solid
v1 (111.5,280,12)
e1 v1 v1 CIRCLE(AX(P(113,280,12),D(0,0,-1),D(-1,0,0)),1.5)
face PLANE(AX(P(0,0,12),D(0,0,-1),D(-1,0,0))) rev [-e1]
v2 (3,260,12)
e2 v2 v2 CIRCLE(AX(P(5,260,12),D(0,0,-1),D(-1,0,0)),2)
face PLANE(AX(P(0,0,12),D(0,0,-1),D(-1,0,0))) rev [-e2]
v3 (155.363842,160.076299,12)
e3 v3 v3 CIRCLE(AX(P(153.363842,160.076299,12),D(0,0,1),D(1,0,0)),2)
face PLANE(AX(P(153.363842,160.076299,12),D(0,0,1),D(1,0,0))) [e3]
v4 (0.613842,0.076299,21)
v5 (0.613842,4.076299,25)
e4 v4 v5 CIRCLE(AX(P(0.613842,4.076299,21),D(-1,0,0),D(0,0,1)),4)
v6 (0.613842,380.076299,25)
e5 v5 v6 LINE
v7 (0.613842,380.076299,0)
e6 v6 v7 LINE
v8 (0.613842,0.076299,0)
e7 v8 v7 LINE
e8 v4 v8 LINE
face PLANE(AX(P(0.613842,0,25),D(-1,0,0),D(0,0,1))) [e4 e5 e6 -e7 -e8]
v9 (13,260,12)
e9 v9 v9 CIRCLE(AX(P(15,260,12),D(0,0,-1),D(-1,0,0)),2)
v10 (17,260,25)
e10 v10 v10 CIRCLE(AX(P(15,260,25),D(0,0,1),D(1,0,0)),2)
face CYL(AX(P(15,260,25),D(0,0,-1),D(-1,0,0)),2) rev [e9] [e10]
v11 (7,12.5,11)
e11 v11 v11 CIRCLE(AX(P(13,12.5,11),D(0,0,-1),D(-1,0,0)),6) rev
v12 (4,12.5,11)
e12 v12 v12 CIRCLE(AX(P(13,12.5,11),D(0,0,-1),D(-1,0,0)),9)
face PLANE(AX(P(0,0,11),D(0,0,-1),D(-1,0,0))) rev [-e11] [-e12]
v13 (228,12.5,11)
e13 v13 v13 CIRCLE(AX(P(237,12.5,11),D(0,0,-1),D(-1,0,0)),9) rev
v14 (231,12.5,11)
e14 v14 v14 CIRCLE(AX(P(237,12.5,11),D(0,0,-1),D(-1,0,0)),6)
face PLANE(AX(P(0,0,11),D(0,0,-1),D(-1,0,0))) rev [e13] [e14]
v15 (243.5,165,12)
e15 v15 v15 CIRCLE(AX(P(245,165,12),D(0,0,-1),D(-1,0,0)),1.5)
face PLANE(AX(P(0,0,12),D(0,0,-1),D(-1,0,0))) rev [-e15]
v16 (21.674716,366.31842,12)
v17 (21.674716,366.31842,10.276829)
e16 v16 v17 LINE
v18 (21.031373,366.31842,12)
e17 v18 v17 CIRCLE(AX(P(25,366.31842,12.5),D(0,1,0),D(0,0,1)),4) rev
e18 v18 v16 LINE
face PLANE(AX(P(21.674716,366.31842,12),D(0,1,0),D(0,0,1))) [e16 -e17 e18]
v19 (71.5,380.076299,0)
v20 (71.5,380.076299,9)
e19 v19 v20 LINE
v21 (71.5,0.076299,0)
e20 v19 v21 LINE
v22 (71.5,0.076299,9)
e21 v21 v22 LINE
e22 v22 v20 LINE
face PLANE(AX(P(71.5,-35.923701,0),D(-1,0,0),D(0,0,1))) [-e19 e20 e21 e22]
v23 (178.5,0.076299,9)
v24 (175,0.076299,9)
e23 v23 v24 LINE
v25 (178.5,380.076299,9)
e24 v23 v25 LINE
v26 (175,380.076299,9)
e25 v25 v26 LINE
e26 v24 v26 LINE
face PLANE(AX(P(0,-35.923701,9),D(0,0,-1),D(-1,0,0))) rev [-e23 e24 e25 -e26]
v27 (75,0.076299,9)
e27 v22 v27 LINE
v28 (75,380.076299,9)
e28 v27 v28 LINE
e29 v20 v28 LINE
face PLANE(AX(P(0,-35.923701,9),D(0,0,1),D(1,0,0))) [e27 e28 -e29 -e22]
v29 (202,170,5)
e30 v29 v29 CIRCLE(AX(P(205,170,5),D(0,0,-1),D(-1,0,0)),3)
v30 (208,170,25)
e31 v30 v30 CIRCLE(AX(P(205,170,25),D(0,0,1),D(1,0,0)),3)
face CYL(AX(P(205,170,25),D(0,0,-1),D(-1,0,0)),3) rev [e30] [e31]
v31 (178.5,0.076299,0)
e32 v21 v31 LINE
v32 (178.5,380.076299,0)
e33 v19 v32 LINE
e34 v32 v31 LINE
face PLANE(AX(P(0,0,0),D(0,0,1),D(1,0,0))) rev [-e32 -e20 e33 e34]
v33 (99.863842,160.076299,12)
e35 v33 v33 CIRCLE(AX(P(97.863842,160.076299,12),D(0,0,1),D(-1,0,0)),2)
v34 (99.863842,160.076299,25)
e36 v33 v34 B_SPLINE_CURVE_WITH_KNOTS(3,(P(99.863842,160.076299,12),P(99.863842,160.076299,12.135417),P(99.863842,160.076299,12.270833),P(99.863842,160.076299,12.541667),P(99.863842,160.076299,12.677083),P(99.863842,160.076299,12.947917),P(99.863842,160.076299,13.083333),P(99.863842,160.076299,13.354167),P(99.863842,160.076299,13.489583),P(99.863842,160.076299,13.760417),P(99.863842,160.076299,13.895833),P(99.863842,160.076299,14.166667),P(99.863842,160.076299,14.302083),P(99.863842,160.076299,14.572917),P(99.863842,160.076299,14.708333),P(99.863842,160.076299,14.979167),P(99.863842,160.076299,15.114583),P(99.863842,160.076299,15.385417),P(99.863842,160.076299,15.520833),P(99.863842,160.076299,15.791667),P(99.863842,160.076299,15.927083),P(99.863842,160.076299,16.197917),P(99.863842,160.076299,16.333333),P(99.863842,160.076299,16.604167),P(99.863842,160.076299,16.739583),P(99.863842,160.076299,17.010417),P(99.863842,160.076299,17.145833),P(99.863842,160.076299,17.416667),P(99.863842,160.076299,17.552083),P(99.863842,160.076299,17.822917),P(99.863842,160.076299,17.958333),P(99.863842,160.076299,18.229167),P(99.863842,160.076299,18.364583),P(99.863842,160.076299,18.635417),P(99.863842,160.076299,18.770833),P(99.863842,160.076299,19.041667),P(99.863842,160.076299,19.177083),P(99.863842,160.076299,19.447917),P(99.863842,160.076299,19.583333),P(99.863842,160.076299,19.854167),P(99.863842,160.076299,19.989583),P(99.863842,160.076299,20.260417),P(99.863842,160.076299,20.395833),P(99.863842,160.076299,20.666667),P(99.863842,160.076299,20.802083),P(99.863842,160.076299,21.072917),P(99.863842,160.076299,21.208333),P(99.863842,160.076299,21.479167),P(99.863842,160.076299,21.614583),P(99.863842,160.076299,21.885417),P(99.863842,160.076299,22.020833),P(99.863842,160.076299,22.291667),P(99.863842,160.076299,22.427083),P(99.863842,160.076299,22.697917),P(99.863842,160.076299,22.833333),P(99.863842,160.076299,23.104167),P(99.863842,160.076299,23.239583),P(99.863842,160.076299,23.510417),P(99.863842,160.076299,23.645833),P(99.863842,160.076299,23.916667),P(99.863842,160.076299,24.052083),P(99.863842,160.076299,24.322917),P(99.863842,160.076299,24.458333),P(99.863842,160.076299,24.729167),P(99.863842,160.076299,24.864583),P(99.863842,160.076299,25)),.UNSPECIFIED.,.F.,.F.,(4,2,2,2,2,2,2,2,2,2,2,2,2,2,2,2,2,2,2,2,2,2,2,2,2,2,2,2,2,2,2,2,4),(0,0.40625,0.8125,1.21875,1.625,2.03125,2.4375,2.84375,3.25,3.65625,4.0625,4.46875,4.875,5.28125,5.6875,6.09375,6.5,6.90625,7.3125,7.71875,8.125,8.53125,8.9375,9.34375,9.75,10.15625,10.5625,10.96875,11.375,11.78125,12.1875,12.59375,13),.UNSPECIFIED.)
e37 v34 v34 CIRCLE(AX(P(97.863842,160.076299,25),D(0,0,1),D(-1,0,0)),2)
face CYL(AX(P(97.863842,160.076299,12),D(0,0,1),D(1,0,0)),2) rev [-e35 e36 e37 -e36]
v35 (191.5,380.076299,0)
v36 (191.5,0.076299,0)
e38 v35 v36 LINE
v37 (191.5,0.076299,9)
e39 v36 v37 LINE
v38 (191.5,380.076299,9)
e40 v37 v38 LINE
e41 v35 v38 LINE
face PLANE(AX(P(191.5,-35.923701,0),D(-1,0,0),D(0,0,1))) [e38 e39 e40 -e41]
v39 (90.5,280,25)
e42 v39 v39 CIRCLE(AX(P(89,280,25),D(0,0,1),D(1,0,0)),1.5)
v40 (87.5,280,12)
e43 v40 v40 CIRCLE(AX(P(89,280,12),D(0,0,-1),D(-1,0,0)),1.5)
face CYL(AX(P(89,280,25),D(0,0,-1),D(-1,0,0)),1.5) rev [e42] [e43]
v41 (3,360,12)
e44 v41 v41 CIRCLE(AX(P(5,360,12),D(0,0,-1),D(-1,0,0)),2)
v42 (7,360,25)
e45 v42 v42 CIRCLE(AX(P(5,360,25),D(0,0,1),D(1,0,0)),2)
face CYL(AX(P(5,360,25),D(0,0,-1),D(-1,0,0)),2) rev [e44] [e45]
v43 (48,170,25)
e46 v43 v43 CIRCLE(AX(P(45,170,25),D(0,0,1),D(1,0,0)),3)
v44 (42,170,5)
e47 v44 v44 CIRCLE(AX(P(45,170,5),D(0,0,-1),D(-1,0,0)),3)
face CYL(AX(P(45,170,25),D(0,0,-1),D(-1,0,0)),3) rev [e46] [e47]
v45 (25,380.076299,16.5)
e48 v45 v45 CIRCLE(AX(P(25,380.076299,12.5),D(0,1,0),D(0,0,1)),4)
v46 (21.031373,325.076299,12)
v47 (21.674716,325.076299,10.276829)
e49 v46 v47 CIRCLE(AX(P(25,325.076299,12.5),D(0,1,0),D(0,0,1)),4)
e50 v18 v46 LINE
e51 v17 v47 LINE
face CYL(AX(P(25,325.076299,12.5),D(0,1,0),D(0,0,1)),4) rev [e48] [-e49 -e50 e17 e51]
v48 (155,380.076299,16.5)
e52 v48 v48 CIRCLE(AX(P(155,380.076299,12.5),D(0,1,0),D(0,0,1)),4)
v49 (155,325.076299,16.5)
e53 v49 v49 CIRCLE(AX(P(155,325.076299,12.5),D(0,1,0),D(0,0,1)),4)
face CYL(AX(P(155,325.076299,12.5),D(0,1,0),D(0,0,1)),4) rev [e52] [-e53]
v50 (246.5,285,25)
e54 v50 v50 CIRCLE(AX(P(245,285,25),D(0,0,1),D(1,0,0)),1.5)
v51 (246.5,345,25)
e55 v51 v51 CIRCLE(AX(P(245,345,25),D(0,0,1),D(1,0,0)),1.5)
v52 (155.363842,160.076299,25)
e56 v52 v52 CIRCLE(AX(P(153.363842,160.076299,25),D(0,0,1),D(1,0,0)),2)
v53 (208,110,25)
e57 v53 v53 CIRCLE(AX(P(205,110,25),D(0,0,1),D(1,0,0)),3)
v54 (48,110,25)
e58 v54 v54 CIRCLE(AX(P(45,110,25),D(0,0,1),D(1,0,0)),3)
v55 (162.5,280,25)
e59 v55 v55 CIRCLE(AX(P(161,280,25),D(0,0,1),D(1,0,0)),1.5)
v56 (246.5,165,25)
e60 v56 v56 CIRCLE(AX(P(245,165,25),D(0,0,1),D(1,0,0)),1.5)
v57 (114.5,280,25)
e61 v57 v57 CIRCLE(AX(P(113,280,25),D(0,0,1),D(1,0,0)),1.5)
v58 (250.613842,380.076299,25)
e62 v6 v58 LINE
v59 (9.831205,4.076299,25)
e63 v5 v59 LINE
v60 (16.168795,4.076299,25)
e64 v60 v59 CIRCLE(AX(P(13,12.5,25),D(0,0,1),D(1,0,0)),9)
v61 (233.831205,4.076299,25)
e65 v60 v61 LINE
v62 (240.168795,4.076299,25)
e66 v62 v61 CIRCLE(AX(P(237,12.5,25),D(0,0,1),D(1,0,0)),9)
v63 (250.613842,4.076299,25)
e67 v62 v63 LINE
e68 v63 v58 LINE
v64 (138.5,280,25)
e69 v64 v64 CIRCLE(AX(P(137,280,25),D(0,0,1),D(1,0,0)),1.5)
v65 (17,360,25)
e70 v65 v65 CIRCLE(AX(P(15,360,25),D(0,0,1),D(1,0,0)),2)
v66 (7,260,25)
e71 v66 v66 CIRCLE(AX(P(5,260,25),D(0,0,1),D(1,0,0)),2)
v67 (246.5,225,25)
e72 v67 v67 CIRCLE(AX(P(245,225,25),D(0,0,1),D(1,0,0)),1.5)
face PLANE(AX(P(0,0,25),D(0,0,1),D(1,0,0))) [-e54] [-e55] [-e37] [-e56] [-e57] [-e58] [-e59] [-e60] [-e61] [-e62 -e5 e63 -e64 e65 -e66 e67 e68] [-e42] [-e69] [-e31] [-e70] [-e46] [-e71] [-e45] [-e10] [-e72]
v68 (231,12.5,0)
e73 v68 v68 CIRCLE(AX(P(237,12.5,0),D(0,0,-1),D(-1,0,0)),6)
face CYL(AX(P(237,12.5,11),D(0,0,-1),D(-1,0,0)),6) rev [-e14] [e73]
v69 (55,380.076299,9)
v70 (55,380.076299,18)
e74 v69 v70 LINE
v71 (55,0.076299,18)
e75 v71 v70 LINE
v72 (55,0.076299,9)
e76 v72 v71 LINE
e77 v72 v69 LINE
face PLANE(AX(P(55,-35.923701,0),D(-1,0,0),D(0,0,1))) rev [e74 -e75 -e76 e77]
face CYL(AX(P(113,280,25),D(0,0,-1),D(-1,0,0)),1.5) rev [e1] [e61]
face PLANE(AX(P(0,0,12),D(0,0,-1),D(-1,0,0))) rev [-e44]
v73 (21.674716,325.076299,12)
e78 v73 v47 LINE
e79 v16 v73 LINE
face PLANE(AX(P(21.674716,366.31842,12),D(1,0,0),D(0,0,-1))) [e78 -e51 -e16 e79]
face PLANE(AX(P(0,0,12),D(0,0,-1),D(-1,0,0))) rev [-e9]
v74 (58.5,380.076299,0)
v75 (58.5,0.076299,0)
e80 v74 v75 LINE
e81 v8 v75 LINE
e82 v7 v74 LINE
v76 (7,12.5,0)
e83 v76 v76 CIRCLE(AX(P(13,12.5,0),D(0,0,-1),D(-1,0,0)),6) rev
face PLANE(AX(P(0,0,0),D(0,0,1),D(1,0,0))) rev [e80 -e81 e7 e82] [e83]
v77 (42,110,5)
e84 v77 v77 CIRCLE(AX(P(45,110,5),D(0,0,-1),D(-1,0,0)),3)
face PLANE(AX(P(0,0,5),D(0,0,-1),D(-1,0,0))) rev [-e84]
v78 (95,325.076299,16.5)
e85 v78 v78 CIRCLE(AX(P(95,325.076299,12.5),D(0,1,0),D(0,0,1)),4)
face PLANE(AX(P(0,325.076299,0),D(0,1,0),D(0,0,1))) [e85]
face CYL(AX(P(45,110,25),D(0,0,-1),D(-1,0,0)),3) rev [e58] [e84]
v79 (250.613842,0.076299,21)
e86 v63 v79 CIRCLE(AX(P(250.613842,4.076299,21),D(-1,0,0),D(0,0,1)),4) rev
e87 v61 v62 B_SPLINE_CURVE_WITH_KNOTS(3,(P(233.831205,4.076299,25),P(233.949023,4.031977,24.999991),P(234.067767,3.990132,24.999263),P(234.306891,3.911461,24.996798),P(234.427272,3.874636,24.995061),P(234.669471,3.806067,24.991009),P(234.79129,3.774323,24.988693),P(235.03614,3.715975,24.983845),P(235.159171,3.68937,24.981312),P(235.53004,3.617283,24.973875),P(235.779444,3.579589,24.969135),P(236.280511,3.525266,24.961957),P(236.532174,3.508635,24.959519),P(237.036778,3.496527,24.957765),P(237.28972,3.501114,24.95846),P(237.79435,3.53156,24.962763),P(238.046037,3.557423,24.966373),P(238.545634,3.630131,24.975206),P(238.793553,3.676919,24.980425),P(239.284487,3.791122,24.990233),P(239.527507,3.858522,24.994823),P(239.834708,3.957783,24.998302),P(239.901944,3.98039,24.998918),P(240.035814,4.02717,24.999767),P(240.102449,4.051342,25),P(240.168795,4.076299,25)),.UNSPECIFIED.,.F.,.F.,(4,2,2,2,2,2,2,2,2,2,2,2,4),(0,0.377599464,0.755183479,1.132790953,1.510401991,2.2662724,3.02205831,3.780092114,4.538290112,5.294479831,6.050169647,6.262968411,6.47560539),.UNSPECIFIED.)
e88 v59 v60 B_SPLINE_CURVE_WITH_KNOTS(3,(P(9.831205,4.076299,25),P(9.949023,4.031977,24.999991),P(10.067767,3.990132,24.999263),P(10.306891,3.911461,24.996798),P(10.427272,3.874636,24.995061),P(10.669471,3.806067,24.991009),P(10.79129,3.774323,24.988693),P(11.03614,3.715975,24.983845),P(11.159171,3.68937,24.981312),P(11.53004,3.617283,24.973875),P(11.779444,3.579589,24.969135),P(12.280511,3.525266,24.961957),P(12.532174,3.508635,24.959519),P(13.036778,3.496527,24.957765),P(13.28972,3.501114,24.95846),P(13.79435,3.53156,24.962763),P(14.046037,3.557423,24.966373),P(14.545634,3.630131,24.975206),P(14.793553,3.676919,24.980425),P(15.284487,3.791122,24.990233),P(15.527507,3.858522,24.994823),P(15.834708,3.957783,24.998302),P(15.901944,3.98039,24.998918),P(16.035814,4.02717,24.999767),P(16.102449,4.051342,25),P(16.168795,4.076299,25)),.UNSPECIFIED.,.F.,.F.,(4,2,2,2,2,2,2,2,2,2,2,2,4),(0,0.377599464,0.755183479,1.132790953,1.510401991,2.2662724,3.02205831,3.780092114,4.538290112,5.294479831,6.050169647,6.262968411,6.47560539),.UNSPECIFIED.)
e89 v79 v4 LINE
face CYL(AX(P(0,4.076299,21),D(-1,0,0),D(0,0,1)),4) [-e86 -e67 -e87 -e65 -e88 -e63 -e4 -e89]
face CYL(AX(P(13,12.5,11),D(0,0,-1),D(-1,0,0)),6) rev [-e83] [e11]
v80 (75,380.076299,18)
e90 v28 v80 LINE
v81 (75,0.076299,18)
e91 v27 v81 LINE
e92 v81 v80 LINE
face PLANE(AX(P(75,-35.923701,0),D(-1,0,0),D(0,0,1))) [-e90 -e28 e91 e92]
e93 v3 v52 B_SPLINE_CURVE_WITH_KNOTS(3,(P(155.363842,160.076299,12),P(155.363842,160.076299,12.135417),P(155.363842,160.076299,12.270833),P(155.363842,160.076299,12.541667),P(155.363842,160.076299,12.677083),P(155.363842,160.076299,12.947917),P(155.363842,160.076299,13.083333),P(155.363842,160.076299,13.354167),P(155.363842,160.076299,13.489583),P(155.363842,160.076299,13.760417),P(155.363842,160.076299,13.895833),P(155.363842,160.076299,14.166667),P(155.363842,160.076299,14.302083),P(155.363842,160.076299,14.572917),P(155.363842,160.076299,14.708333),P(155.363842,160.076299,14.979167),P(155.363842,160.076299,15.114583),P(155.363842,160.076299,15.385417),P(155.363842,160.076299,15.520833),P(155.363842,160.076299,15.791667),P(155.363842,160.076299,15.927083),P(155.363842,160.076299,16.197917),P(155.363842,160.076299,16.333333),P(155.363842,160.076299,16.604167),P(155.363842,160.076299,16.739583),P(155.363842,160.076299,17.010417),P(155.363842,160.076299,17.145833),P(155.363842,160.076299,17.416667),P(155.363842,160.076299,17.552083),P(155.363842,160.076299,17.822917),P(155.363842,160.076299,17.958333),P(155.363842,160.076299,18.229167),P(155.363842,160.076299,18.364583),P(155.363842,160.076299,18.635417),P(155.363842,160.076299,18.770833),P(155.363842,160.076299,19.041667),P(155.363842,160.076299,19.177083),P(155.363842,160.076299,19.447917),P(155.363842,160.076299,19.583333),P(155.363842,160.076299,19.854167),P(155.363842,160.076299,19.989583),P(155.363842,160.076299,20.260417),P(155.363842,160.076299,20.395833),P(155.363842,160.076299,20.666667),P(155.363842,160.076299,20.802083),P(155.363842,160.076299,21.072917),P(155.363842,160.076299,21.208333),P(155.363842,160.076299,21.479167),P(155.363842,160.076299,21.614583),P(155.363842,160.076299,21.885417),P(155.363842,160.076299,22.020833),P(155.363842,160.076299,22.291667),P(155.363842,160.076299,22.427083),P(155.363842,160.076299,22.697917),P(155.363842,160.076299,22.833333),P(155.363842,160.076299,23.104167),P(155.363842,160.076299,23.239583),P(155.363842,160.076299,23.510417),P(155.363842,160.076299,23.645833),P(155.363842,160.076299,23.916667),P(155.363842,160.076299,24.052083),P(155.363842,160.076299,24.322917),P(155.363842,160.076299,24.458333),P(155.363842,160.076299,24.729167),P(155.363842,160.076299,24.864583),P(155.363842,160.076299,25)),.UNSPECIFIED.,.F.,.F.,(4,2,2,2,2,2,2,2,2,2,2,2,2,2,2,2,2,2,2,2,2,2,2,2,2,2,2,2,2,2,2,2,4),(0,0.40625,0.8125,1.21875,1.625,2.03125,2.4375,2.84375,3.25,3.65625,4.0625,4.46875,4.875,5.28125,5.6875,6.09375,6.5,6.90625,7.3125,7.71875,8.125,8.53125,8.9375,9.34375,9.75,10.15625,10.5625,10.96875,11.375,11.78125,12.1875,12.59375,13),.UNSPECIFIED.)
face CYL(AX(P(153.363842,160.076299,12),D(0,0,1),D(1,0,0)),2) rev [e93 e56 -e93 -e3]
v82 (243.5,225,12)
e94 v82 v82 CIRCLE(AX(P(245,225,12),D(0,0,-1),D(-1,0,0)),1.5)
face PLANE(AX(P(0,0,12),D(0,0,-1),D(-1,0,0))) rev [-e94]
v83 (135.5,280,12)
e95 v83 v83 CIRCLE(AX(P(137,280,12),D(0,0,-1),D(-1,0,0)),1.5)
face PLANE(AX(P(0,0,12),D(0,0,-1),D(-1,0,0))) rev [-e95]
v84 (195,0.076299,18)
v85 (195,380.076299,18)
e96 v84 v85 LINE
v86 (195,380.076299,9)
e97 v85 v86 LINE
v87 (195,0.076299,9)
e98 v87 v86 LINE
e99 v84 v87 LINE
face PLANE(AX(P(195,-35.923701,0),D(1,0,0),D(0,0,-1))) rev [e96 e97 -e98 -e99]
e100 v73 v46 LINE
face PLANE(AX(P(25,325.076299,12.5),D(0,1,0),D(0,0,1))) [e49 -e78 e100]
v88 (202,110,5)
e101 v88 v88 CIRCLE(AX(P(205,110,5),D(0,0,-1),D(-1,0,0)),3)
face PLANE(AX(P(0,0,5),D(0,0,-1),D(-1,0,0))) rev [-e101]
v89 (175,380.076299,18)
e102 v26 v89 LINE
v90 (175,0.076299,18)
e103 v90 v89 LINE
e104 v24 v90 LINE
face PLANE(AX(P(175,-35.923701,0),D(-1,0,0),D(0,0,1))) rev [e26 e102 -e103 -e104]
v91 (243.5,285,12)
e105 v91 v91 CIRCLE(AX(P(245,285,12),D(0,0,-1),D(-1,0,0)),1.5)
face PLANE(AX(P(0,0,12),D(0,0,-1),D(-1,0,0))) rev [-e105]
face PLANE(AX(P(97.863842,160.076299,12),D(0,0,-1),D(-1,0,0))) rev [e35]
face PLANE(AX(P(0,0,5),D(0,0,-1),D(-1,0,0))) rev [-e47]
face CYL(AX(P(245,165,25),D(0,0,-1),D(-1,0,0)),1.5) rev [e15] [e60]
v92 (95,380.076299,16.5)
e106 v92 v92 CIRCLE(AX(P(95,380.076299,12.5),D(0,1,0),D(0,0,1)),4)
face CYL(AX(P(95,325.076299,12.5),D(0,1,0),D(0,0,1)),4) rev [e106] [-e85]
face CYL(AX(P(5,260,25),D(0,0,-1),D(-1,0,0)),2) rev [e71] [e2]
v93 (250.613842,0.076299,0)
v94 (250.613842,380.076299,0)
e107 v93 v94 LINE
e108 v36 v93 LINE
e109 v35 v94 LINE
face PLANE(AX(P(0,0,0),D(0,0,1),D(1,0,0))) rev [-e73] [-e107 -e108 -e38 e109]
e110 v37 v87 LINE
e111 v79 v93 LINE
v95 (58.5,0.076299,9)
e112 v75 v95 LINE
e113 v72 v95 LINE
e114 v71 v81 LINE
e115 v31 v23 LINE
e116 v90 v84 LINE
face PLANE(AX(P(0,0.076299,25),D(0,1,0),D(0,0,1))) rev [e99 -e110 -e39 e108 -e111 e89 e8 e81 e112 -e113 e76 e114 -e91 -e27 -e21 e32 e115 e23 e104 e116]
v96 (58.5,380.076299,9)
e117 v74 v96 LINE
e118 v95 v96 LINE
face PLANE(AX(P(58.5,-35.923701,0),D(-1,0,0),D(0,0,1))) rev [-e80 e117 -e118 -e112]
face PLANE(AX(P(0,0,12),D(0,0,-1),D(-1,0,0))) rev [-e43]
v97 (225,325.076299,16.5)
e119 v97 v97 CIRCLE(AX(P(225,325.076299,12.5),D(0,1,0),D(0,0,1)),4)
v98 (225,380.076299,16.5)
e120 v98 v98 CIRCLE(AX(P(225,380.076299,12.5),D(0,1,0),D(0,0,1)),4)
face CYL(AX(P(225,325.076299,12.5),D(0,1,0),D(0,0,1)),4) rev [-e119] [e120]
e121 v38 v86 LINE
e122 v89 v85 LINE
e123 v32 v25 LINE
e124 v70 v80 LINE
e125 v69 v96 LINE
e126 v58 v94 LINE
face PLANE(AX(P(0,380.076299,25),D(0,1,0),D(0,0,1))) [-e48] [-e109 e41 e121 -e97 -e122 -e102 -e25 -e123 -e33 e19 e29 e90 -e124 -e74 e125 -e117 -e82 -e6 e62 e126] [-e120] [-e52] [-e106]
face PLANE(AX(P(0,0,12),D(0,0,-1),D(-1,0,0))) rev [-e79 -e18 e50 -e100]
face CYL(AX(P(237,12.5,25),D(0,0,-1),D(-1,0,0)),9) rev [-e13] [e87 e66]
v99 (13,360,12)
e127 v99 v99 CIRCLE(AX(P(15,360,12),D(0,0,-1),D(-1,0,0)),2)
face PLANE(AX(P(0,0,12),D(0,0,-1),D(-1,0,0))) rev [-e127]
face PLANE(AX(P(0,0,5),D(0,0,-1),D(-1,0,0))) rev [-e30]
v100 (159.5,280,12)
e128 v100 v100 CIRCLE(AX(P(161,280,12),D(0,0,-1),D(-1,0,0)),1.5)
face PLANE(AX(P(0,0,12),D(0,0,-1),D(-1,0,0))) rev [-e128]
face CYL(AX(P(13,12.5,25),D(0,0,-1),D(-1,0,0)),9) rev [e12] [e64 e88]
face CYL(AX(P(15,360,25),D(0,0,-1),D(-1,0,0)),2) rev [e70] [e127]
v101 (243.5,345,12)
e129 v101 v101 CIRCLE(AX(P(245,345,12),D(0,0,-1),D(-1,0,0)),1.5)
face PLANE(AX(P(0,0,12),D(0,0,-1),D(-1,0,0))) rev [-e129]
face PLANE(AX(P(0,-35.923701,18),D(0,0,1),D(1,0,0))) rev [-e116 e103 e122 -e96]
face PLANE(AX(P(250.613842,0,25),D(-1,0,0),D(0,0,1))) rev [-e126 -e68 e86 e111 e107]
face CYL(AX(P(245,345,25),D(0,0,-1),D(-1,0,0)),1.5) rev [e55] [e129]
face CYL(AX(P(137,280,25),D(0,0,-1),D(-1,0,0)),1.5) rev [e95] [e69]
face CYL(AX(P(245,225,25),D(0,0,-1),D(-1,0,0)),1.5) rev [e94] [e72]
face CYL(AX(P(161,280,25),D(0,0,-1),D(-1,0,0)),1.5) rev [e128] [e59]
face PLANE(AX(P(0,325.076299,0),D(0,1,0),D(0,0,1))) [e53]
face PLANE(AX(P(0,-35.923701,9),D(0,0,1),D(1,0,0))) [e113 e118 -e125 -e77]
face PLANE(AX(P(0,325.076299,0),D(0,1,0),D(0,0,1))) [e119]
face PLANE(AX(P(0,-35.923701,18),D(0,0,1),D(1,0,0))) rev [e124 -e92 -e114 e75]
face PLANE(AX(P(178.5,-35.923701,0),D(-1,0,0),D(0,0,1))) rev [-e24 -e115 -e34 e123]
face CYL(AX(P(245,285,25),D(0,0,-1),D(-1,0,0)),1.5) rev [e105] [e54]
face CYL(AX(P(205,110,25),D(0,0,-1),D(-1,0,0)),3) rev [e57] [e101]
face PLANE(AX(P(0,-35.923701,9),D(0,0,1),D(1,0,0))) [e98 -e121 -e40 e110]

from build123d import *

# Parameters (mm, degrees)
SKETCH_1_W          = 250
SKETCH_1_H          = 380
SKETCH_1_R          = 9
SKETCH_1_R_2        = 2
SKETCH_1_R_3        = 1.5
SKETCH_1_R_4        = 3
EXTRUDE_3_DEPTH     = 25
CUT_EXTRUDE_1_DEPTH = 416
SKETCH_3_4_R        = 4
CUT_EXTRUDE_2_DEPTH = 55
SKETCH_5_W          = 76.418543054
SKETCH_5_H          = 18.162254628
EXTRUDE_4_DEPTH     = 12
SKETCH_6_W          = 9.937837438
SKETCH_6_H          = 197.728696601
EXTRUDE_5_DEPTH     = 12
SKETCH_7_W          = 21.060874429
SKETCH_7_H          = 111.734651623
EXTRUDE_6_DEPTH     = 12
SKETCH_8_W          = 15.76346628
SKETCH_8_H          = 76.418543054
EXTRUDE_7_DEPTH     = 5
SKETCH_9_W          = 10.965889587
SKETCH_9_H          = 75.390490905
EXTRUDE_8_DEPTH     = 5
SKETCH_10_W         = 21.30480461
SKETCH_10_H         = 26.996927979
SKETCH_10_R         = 6
EXTRUDE_11_DEPTH    = 11
FILLET_1_R          = 4
SKETCH_11_R         = 2
CUT_EXTRUDE_3_DEPTH = 13


with BuildPart() as part:
    # 草图1 → 凸台-拉伸3 (new body)
    with BuildSketch(Plane.XY):
        with Locations((125.613842041, 190.076299127)):
            Rectangle(SKETCH_1_W, SKETCH_1_H)
        with Locations((13, 12.5)):
            Circle(SKETCH_1_R, mode=Mode.SUBTRACT)
        with Locations((237, 12.5)):
            Circle(SKETCH_1_R, mode=Mode.SUBTRACT)
        with Locations((5, 360)):
            Circle(SKETCH_1_R_2, mode=Mode.SUBTRACT)
        with Locations((5, 260)):
            Circle(SKETCH_1_R_2, mode=Mode.SUBTRACT)
        with Locations((15, 360)):
            Circle(SKETCH_1_R_2, mode=Mode.SUBTRACT)
        with Locations((15, 260)):
            Circle(SKETCH_1_R_2, mode=Mode.SUBTRACT)
        with Locations((89, 280)):
            Circle(SKETCH_1_R_3, mode=Mode.SUBTRACT)
        with Locations((113, 280)):
            Circle(SKETCH_1_R_3, mode=Mode.SUBTRACT)
        with Locations((137, 280)):
            Circle(SKETCH_1_R_3, mode=Mode.SUBTRACT)
        with Locations((161, 280)):
            Circle(SKETCH_1_R_3, mode=Mode.SUBTRACT)
        with Locations((45, 110)):
            Circle(SKETCH_1_R_4, mode=Mode.SUBTRACT)
        with Locations((45, 170)):
            Circle(SKETCH_1_R_4, mode=Mode.SUBTRACT)
        with Locations((205, 170)):
            Circle(SKETCH_1_R_4, mode=Mode.SUBTRACT)
        with Locations((205, 110)):
            Circle(SKETCH_1_R_4, mode=Mode.SUBTRACT)
        with Locations((245, 345)):
            Circle(SKETCH_1_R_3, mode=Mode.SUBTRACT)
        with Locations((245, 285)):
            Circle(SKETCH_1_R_3, mode=Mode.SUBTRACT)
        with Locations((245, 225)):
            Circle(SKETCH_1_R_3, mode=Mode.SUBTRACT)
        with Locations((245, 165)):
            Circle(SKETCH_1_R_3, mode=Mode.SUBTRACT)
    extrude(amount=EXTRUDE_3_DEPTH)

    # 草图3 → 切除-拉伸1 (cut)
    with BuildSketch(Plane(origin=(0, 380.076299127, 0), x_dir=(1, 0, 0), z_dir=(0, 1, 0))):
        Polygon((71.5, -9), (71.5, 0), (58.5, 0), (58.5, -9), (55, -9), (55, -18), (75, -18), (75, -9), align=None)
        Polygon((191.5, 0), (178.5, 0), (178.5, -9), (175, -9), (175, -18), (195, -18), (195, -9), (191.5, -9), align=None)
    extrude(amount=-CUT_EXTRUDE_1_DEPTH, mode=Mode.SUBTRACT)

    # 草图3<4> → 切除-拉伸2 (cut)
    with BuildSketch(Plane(origin=(0, 380.076299127, 0), x_dir=(1, 0, 0), z_dir=(0, 1, 0))):
        with Locations(Location((95, -12.5, 0), (0, 0, 270))):
            Circle(SKETCH_3_4_R)
        with Locations(Location((155, -12.5, 0), (0, 0, 270))):
            Circle(SKETCH_3_4_R)
        with Locations(Location((225, -12.5, 0), (0, 0, 270))):
            Circle(SKETCH_3_4_R)
        with Locations(Location((25, -12.5, 0), (0, 0, 270))):
            Circle(SKETCH_3_4_R)
    extrude(amount=-CUT_EXTRUDE_2_DEPTH, mode=Mode.SUBTRACT)

    # 草图5 → 凸台-拉伸4 (add)
    with BuildSketch(Plane(origin=(0, 0, 0), x_dir=(-1, 0, 0), z_dir=(0, 0, -1))):
        with Locations((-124.414447867, 279.859520114)):
            Rectangle(SKETCH_5_W, SKETCH_5_H)
    extrude(amount=-EXTRUDE_4_DEPTH)

    # 草图6 → 凸台-拉伸5 (add)
    with BuildSketch(Plane(origin=(0, 0, 0), x_dir=(-1, 0, 0), z_dir=(0, 0, -1))):
        with Locations((-244.34867248, 253.130164248)):
            Rectangle(SKETCH_6_W, SKETCH_6_H)
    extrude(amount=-EXTRUDE_5_DEPTH)

    # 草图7 → 凸台-拉伸6 (add)
    with BuildSketch(Plane(origin=(0, 0, 0), x_dir=(-1, 0, 0), z_dir=(0, 0, -1))):
        with Locations((-11.144279256, 310.45109449)):
            Rectangle(SKETCH_7_W, SKETCH_7_H)
    extrude(amount=-EXTRUDE_6_DEPTH)

    # 草图8 → 凸台-拉伸7 (add)
    with BuildSketch(Plane(origin=(0, 0, 0), x_dir=(-1, 0, 0), z_dir=(0, 0, -1))):
        with Locations((-204.431173441, 138.673691692)):
            Rectangle(SKETCH_8_W, SKETCH_8_H)
    extrude(amount=-EXTRUDE_7_DEPTH)

    # 草图9 → 凸台-拉伸8 (add)
    with BuildSketch(Plane(origin=(0, 0, 0), x_dir=(-1, 0, 0), z_dir=(0, 0, -1))):
        with Locations((-45.425774442, 139.530401815)):
            Rectangle(SKETCH_9_W, SKETCH_9_H)
    extrude(amount=-EXTRUDE_8_DEPTH)

    # 草图10 → 凸台-拉伸11 (add)
    # profile 1 of 2: a face of its own
    with BuildSketch(Plane(origin=(0, 0, 0), x_dir=(-1, 0, 0), z_dir=(0, 0, -1))):
        with Locations((-236.946967286, 15.123600302)):
            Rectangle(SKETCH_10_W, SKETCH_10_H)
        with Locations((-237, 12.5)):
            Circle(SKETCH_10_R, mode=Mode.SUBTRACT)
    # profile 2 of 2: a face of its own
    with BuildSketch(Plane(origin=(0, 0, 0), x_dir=(-1, 0, 0), z_dir=(0, 0, -1))):
        with Locations((-13.053032714, 15.123600302)):
            Rectangle(SKETCH_10_W, SKETCH_10_H)
        with Locations((-13, 12.5)):
            Circle(SKETCH_10_R, mode=Mode.SUBTRACT)
    extrude(amount=-EXTRUDE_11_DEPTH)

    # 圆角1
    # the kernel refuses this fillet: 4 mm, written as the material it takes off along each edge
    with BuildSketch(Plane(origin=(-9.386157959, 0.076299127, 25), x_dir=(0, 0, -1), z_dir=(1, 0, 0))) as fillet_1_piece_1:
        with BuildLine():
            CenterArc((FILLET_1_R, FILLET_1_R), FILLET_1_R, 180, 90)
            Line((0, FILLET_1_R), (0, 0))
            Line((0, 0), (FILLET_1_R, 0))
        make_face()
    extrude(amount=270, mode=Mode.SUBTRACT)

    # 草图11 → 切除-拉伸3 (cut)
    with BuildSketch(Plane.XY.offset(25)):
        with Locations((153.363842041, 160.076299127)):
            Circle(SKETCH_11_R)
        with Locations((97.863842041, 160.076299127)):
            Circle(SKETCH_11_R)
    extrude(amount=-CUT_EXTRUDE_3_DEPTH, mode=Mode.SUBTRACT)


solid = part.part
